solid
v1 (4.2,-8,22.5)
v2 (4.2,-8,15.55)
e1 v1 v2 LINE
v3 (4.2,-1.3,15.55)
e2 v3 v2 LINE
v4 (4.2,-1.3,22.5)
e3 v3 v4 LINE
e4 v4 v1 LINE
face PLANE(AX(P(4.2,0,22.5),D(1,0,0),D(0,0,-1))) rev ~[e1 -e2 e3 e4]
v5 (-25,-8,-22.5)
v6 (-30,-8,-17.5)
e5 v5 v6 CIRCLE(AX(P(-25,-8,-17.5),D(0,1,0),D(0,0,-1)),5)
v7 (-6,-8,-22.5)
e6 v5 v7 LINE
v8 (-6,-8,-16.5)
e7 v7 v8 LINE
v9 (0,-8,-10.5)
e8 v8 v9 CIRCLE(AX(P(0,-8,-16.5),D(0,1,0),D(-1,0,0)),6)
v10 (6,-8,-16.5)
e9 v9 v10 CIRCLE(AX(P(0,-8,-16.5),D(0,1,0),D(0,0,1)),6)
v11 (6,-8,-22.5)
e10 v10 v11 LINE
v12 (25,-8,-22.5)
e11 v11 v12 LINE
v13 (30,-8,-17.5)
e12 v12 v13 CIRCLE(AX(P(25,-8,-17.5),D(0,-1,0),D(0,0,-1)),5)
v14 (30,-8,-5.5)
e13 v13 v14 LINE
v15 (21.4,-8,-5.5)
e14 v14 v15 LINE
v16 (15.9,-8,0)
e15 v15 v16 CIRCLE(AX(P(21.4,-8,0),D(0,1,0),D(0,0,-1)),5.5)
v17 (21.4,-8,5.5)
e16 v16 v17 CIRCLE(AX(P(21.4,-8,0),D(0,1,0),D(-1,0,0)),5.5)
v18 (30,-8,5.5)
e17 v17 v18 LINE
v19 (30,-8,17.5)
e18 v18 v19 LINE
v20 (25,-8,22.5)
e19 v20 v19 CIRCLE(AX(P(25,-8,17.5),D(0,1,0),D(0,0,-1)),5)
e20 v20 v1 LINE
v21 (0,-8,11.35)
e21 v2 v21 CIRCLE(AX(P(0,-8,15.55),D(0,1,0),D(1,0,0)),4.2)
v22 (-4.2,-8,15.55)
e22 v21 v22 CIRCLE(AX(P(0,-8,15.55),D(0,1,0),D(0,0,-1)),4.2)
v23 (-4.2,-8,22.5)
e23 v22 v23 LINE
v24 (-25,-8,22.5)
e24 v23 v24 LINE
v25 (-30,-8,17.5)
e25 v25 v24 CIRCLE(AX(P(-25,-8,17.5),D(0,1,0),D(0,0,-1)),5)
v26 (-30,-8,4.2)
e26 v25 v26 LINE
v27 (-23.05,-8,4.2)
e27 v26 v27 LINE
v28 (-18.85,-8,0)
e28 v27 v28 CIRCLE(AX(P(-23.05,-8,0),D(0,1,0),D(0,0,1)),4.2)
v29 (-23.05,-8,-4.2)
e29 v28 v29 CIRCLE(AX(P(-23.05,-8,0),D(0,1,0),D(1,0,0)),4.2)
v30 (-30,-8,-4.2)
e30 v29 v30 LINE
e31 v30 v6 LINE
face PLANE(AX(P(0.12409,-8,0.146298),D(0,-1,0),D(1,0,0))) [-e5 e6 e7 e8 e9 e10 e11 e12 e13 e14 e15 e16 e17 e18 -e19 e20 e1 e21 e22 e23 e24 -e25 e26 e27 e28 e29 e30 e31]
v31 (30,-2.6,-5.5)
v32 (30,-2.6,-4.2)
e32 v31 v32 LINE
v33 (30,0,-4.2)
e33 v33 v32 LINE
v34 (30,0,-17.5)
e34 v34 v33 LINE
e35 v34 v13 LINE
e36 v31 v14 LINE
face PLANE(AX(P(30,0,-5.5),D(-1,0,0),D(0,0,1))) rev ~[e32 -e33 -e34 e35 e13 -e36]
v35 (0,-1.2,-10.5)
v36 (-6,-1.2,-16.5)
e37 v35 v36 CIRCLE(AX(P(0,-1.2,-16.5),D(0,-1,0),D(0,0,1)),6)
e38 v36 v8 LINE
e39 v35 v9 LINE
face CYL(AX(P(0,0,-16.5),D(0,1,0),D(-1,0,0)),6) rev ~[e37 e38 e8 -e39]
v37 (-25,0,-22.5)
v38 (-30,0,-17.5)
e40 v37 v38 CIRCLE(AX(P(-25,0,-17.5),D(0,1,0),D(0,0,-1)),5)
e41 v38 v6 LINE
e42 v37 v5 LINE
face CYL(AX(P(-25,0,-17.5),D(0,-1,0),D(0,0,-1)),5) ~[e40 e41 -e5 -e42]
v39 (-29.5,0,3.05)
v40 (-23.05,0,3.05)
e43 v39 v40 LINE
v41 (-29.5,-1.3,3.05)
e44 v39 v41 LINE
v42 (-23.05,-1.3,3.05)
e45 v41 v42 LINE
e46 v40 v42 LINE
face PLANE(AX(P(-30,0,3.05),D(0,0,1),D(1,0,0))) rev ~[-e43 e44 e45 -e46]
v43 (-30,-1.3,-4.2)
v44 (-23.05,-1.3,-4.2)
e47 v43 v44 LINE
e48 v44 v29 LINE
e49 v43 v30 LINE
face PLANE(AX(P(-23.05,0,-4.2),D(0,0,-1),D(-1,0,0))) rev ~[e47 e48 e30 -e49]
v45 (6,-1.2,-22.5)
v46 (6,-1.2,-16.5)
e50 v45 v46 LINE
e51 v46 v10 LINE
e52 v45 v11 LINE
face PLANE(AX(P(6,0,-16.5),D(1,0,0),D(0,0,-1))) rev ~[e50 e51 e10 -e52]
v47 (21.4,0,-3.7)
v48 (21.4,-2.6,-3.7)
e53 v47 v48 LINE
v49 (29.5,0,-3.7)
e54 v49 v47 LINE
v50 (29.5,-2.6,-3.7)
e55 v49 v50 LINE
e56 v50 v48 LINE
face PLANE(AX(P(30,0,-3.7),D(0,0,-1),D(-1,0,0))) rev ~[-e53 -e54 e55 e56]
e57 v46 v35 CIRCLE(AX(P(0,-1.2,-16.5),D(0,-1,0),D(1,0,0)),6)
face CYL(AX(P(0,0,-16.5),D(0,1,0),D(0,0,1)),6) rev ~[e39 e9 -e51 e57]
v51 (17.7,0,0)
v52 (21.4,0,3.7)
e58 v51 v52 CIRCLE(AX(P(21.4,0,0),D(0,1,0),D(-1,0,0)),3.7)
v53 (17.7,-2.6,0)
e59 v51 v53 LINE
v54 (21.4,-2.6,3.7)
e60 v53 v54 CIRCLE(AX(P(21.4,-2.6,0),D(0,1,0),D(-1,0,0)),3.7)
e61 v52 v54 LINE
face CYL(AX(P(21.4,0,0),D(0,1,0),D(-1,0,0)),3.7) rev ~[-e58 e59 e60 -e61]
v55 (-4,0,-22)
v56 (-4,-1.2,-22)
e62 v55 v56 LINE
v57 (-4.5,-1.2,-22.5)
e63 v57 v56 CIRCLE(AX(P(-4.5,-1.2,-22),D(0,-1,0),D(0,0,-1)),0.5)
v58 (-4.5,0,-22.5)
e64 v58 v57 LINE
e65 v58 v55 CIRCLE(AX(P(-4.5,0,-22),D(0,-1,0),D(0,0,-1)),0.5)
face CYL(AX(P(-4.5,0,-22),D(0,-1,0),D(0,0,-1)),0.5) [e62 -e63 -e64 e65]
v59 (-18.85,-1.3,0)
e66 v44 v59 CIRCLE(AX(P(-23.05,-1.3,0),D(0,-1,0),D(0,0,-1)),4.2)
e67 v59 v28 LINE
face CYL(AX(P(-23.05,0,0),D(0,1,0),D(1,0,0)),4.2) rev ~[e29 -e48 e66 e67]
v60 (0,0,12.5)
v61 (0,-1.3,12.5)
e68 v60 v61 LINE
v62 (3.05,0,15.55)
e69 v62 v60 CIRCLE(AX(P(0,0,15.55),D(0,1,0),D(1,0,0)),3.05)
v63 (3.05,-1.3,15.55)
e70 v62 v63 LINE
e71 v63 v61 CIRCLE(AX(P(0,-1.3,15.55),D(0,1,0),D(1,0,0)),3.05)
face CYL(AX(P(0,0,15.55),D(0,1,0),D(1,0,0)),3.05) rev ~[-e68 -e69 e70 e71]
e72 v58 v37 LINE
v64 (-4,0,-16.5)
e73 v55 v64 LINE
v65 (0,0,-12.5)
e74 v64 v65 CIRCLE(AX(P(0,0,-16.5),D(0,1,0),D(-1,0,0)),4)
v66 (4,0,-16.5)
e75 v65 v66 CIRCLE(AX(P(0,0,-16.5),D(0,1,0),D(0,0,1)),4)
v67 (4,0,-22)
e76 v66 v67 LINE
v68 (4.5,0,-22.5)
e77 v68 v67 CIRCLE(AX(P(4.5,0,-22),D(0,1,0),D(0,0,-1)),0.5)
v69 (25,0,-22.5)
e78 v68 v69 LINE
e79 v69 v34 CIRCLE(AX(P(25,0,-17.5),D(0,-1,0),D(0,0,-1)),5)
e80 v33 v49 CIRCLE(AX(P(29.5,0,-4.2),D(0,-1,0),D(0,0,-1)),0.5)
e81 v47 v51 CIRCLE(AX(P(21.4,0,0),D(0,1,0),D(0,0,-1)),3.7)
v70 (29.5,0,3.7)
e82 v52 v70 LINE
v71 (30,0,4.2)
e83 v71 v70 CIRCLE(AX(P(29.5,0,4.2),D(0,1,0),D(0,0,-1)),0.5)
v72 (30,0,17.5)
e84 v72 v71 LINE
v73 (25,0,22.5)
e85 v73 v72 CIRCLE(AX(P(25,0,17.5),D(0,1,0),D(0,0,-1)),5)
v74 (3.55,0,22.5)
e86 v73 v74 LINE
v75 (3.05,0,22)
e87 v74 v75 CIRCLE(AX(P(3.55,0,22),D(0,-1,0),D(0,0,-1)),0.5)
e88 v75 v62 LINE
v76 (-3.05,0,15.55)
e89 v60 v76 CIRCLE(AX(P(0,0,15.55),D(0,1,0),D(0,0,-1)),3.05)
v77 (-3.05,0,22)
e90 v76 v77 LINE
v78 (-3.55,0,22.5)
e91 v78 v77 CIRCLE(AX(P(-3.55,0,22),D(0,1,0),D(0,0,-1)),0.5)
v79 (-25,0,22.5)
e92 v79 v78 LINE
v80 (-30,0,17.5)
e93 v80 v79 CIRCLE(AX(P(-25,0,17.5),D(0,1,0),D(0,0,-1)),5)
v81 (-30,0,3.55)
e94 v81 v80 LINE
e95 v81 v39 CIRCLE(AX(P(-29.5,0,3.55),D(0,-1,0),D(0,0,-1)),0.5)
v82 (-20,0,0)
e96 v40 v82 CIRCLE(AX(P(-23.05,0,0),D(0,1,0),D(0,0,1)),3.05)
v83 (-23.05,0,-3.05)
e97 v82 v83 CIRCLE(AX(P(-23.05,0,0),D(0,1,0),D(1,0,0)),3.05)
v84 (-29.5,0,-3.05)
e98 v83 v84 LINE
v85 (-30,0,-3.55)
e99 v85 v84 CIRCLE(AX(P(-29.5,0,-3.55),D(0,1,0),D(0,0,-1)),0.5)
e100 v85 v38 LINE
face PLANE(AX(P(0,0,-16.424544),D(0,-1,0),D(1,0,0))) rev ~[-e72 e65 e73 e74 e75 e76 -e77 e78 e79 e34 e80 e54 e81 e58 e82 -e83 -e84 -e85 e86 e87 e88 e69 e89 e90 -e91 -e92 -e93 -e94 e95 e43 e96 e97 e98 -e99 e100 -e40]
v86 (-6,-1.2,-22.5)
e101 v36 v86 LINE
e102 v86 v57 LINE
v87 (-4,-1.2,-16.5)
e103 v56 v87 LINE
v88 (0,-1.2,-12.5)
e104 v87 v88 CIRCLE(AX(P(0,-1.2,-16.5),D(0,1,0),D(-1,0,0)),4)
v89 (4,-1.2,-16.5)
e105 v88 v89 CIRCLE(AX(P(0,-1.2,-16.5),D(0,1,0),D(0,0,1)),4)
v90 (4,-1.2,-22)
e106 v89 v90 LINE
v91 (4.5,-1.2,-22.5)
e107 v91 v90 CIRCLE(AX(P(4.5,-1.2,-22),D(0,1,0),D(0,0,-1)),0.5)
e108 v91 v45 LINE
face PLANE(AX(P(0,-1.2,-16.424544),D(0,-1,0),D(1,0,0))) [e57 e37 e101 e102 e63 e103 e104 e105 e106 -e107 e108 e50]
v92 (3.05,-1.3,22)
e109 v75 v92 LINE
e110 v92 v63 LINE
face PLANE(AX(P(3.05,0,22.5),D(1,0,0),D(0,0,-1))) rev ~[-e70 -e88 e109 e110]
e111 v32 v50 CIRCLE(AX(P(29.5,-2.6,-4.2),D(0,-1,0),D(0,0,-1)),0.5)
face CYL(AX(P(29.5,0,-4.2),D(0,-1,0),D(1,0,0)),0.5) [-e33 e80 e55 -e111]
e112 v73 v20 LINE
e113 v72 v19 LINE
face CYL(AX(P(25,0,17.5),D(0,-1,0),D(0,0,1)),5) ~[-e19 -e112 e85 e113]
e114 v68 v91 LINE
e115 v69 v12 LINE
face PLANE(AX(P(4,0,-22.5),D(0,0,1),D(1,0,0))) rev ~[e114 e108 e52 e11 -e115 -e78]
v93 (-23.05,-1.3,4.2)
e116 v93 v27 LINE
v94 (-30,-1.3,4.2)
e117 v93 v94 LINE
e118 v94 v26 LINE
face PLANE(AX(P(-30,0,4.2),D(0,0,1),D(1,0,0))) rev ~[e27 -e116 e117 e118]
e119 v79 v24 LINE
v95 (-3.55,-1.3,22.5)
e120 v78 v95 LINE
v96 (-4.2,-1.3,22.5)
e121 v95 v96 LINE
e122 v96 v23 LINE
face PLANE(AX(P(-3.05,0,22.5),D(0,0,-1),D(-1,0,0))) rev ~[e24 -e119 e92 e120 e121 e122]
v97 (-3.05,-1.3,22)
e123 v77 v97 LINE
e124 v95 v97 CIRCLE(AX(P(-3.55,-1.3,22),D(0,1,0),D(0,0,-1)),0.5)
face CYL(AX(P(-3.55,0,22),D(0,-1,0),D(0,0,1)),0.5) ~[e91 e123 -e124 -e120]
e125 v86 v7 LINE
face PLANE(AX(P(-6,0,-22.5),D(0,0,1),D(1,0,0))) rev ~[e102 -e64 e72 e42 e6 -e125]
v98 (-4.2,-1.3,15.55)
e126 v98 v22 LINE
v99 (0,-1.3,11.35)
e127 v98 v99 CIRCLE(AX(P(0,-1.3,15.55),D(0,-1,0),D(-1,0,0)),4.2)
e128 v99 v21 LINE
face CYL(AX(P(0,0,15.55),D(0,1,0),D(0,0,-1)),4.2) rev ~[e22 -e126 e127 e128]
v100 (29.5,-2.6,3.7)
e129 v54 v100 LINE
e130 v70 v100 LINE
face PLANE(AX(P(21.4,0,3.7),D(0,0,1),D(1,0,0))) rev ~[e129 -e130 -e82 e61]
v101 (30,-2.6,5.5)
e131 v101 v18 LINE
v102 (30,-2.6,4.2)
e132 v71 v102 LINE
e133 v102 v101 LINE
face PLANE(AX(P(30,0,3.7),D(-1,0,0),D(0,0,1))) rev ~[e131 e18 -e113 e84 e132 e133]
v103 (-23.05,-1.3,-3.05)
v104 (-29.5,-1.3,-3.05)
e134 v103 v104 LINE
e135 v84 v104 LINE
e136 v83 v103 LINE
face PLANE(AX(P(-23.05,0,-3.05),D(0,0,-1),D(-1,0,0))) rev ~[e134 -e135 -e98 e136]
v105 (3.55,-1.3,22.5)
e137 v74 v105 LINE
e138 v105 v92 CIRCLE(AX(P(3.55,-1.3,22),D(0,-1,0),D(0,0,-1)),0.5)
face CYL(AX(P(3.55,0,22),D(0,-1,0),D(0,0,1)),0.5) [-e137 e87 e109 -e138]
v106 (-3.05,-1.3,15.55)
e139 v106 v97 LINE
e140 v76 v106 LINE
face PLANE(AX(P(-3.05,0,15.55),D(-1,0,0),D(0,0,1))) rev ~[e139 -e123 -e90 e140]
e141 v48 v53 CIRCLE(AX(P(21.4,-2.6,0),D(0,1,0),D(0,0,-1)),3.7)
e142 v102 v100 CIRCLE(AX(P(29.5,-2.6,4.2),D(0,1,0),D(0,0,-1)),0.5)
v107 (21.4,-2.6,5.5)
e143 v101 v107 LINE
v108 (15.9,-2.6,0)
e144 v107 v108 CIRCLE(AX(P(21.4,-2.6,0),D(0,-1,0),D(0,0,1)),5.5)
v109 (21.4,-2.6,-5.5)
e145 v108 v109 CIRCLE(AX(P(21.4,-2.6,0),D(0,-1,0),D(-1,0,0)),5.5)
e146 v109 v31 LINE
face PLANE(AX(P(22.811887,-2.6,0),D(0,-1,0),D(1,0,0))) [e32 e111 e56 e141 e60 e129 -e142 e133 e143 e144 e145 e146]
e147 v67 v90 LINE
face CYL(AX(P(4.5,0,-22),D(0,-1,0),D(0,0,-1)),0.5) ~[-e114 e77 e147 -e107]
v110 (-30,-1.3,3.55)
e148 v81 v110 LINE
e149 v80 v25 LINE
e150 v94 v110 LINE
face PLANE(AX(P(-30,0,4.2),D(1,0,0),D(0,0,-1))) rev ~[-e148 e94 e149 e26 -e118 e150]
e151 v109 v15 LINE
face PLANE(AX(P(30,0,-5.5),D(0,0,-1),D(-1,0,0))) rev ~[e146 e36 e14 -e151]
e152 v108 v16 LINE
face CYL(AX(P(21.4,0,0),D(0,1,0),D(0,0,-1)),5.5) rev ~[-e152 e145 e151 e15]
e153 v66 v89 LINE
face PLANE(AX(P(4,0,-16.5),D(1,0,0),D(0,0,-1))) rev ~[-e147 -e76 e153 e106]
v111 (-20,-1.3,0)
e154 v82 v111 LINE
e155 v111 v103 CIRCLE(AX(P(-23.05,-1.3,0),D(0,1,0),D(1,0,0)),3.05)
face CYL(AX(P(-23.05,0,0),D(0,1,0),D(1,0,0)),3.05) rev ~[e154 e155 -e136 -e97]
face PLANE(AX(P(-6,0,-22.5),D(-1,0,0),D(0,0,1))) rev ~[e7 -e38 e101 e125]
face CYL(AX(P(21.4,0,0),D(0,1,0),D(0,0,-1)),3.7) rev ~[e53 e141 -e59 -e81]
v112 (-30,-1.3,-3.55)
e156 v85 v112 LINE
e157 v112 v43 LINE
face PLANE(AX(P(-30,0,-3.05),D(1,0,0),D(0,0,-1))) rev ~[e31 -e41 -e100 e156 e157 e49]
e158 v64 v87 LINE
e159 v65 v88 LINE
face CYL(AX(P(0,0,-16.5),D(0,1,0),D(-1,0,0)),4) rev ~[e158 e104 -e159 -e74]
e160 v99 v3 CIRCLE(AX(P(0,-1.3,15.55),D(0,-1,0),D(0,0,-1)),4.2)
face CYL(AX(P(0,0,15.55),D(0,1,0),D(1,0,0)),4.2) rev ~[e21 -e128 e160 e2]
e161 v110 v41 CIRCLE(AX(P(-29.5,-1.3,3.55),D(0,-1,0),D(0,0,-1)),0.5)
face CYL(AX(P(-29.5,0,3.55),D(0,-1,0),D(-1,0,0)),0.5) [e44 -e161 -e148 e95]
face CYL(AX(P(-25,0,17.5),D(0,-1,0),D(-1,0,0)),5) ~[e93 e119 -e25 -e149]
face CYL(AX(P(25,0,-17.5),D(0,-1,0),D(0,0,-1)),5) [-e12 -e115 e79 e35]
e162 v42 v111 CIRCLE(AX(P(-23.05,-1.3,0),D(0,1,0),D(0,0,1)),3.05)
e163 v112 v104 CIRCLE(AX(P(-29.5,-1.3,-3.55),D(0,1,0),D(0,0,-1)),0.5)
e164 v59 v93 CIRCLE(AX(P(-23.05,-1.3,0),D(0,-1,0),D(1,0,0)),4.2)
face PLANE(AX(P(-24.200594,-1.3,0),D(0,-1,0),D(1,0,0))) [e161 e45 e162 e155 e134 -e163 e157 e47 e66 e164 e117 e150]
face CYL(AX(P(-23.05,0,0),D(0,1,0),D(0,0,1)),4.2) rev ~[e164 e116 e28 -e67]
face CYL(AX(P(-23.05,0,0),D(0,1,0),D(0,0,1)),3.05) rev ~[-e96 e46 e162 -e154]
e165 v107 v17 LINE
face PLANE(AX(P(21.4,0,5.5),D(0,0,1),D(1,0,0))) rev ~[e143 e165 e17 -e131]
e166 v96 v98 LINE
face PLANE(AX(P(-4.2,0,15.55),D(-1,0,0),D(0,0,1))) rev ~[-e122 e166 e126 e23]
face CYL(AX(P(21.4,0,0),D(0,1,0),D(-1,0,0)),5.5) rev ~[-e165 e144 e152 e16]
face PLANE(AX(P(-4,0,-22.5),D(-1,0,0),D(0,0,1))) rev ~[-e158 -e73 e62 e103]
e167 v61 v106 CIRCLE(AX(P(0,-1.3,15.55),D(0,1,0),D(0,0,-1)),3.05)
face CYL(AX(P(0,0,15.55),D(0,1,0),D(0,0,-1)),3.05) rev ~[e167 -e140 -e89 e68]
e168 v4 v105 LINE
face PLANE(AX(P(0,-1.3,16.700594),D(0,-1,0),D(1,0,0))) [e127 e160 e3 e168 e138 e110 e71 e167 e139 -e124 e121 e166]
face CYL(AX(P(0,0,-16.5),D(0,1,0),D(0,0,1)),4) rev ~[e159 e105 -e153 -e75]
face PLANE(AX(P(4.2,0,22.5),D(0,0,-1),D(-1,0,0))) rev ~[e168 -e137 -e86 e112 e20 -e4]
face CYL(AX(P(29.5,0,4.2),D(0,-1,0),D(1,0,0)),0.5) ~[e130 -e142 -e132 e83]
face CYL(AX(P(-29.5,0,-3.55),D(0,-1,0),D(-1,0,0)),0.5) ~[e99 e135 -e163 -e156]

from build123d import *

# Parameters (mm, degrees)
F1_DEPTH = 8
F2_DEPTH = 1.3
F3_DEPTH = 2.6
F4_DEPTH = 1.3
F5_DEPTH = 1.2
F6_R     = 5
F7_R     = 0.5


with BuildPart() as f1:
    # F0 (on Front) → F1 (new body)
    with BuildSketch(Plane.XZ):
        with BuildLine():
            Line((6, -22.5), (30, -22.5))
            Line((30, -22.5), (30, -5.5))
            Line((30, -5.5), (21.4, -5.5))
            ThreePointArc((21.4, -5.5), (17.5109127035, -3.8890872965), (15.9, 0))
            ThreePointArc((15.9, 0), (17.5109127035, 3.8890872965), (21.4, 5.5))
            Line((21.4, 5.5), (30, 5.5))
            Line((30, 5.5), (30, 22.5))
            Line((30, 22.5), (4.2, 22.5))
            Line((4.2, 22.5), (4.2, 15.5500004172))
            ThreePointArc((4.2, 15.5500004172), (2.969848481, 12.5801519362), (0, 11.3500004172))
            ThreePointArc((0, 11.3500004172), (-2.969848481, 12.5801519362), (-4.2, 15.5500004172))
            Line((-4.2, 15.5500004172), (-4.2, 22.5))
            Line((-4.2, 22.5), (-30, 22.5))
            Line((-30, 22.5), (-30, 4.2))
            Line((-30, 4.2), (-23.05, 4.2))
            ThreePointArc((-23.05, 4.2), (-20.080151519, 2.969848481), (-18.85, 0))
            ThreePointArc((-18.85, 0), (-20.080151519, -2.969848481), (-23.05, -4.2))
            Line((-23.05, -4.2), (-30, -4.2))
            Line((-30, -4.2), (-30, -22.5))
            Line((-30, -22.5), (-6, -22.5))
            Line((-6, -22.5), (-6, -16.5))
            ThreePointArc((-6, -16.5), (-4.2426406871, -12.2573593129), (0, -10.5))
            ThreePointArc((0, -10.5), (4.2426406871, -12.2573593129), (6, -16.5))
            Line((6, -16.5), (6, -22.5))
        make_face()
    extrude(amount=F1_DEPTH)

    # F0 (on Front) → F2 (join)
    with BuildSketch(Plane.XZ):
        with BuildLine():
            Line((-30, -3.05), (-30, -4.2))
            Line((-30, -4.2), (-23.05, -4.2))
            ThreePointArc((-23.05, -4.2), (-20.080151519, -2.969848481), (-18.85, 0))
            ThreePointArc((-18.85, 0), (-20.080151519, 2.969848481), (-23.05, 4.2))
            Line((-23.05, 4.2), (-30, 4.2))
            Line((-30, 4.2), (-30, 3.05))
            Line((-30, 3.05), (-23.05, 3.05))
            ThreePointArc((-23.05, 3.05), (-20.8933243174, 2.1566756826), (-20, 0))
            ThreePointArc((-20, 0), (-20.8933243174, -2.1566756826), (-23.05, -3.05))
            Line((-23.05, -3.05), (-30, -3.05))
        make_face()
    extrude(amount=F2_DEPTH)

    # F0 (on Front) → F3 (join)
    with BuildSketch(Plane.XZ):
        with BuildLine():
            Line((21.4, -5.5), (30, -5.5))
            Line((30, -5.5), (30, -3.7))
            Line((30, -3.7), (21.4, -3.7))
            ThreePointArc((21.4, -3.7), (18.7837049096, -2.6162950904), (17.7, 0))
            ThreePointArc((17.7, 0), (18.7837049096, 2.6162950904), (21.4, 3.7))
            Line((21.4, 3.7), (30, 3.7))
            Line((30, 3.7), (30, 5.5))
            Line((30, 5.5), (21.4, 5.5))
            ThreePointArc((21.4, 5.5), (17.5109127035, 3.8890872965), (15.9, 0))
            ThreePointArc((15.9, 0), (17.5109127035, -3.8890872965), (21.4, -5.5))
        make_face()
    extrude(amount=F3_DEPTH)

    # F0 (on Front) → F4 (join)
    with BuildSketch(Plane.XZ):
        with BuildLine():
            Line((4.2, 15.5500004172), (4.2, 22.5))
            Line((4.2, 22.5), (3.05, 22.5))
            Line((3.05, 22.5), (3.05, 15.5500004172))
            ThreePointArc((3.05, 15.5500004172), (2.1566756826, 13.3933247346), (0, 12.5000004172))
            ThreePointArc((0, 12.5000004172), (-2.1566756826, 13.3933247346), (-3.05, 15.5500004172))
            Line((-3.05, 15.5500004172), (-3.05, 22.5))
            Line((-3.05, 22.5), (-4.2, 22.5))
            Line((-4.2, 22.5), (-4.2, 15.5500004172))
            ThreePointArc((-4.2, 15.5500004172), (-2.969848481, 12.5801519362), (0, 11.3500004172))
            ThreePointArc((0, 11.3500004172), (2.969848481, 12.5801519362), (4.2, 15.5500004172))
        make_face()
    extrude(amount=F4_DEPTH)

    # F0 (on Front) → F5 (join)
    with BuildSketch(Plane.XZ):
        with BuildLine():
            Line((4, -22.5), (6, -22.5))
            Line((6, -22.5), (6, -16.5))
            ThreePointArc((6, -16.5), (4.2426406871, -12.2573593129), (0, -10.5))
            ThreePointArc((0, -10.5), (-4.2426406871, -12.2573593129), (-6, -16.5))
            Line((-6, -16.5), (-6, -22.5))
            Line((-6, -22.5), (-4, -22.5))
            Line((-4, -22.5), (-4, -16.5))
            ThreePointArc((-4, -16.5), (-2.8284271247, -13.6715728753), (0, -12.5))
            ThreePointArc((0, -12.5), (2.8284271247, -13.6715728753), (4, -16.5))
            Line((4, -16.5), (4, -22.5))
        make_face()
    extrude(amount=F5_DEPTH)

    # F6
    f6_edges = [f1.edges().sort_by_distance(p)[0] for p in [
        (-30, -4, 22.5),
        (30, -4, 22.5),
        (-30, -4, -22.5),
        (30, -4, -22.5),
    ]]
    fillet(f6_edges, radius=F6_R)

    # F7
    f7_edges = [f1.edges().sort_by_distance(p)[0] for p in [
        (-30, -0.65, 3.05),
        (-30, -0.65, -3.05),
        (30, -1.3, 3.7),
        (30, -1.3, -3.7),
        (4, -0.6, -22.5),
        (-4, -0.6, -22.5),
        (3.05, -0.65, 22.5),
        (-3.05, -0.65, 22.5),
    ]]
    fillet(f7_edges, radius=F7_R)


solid = f1.part
